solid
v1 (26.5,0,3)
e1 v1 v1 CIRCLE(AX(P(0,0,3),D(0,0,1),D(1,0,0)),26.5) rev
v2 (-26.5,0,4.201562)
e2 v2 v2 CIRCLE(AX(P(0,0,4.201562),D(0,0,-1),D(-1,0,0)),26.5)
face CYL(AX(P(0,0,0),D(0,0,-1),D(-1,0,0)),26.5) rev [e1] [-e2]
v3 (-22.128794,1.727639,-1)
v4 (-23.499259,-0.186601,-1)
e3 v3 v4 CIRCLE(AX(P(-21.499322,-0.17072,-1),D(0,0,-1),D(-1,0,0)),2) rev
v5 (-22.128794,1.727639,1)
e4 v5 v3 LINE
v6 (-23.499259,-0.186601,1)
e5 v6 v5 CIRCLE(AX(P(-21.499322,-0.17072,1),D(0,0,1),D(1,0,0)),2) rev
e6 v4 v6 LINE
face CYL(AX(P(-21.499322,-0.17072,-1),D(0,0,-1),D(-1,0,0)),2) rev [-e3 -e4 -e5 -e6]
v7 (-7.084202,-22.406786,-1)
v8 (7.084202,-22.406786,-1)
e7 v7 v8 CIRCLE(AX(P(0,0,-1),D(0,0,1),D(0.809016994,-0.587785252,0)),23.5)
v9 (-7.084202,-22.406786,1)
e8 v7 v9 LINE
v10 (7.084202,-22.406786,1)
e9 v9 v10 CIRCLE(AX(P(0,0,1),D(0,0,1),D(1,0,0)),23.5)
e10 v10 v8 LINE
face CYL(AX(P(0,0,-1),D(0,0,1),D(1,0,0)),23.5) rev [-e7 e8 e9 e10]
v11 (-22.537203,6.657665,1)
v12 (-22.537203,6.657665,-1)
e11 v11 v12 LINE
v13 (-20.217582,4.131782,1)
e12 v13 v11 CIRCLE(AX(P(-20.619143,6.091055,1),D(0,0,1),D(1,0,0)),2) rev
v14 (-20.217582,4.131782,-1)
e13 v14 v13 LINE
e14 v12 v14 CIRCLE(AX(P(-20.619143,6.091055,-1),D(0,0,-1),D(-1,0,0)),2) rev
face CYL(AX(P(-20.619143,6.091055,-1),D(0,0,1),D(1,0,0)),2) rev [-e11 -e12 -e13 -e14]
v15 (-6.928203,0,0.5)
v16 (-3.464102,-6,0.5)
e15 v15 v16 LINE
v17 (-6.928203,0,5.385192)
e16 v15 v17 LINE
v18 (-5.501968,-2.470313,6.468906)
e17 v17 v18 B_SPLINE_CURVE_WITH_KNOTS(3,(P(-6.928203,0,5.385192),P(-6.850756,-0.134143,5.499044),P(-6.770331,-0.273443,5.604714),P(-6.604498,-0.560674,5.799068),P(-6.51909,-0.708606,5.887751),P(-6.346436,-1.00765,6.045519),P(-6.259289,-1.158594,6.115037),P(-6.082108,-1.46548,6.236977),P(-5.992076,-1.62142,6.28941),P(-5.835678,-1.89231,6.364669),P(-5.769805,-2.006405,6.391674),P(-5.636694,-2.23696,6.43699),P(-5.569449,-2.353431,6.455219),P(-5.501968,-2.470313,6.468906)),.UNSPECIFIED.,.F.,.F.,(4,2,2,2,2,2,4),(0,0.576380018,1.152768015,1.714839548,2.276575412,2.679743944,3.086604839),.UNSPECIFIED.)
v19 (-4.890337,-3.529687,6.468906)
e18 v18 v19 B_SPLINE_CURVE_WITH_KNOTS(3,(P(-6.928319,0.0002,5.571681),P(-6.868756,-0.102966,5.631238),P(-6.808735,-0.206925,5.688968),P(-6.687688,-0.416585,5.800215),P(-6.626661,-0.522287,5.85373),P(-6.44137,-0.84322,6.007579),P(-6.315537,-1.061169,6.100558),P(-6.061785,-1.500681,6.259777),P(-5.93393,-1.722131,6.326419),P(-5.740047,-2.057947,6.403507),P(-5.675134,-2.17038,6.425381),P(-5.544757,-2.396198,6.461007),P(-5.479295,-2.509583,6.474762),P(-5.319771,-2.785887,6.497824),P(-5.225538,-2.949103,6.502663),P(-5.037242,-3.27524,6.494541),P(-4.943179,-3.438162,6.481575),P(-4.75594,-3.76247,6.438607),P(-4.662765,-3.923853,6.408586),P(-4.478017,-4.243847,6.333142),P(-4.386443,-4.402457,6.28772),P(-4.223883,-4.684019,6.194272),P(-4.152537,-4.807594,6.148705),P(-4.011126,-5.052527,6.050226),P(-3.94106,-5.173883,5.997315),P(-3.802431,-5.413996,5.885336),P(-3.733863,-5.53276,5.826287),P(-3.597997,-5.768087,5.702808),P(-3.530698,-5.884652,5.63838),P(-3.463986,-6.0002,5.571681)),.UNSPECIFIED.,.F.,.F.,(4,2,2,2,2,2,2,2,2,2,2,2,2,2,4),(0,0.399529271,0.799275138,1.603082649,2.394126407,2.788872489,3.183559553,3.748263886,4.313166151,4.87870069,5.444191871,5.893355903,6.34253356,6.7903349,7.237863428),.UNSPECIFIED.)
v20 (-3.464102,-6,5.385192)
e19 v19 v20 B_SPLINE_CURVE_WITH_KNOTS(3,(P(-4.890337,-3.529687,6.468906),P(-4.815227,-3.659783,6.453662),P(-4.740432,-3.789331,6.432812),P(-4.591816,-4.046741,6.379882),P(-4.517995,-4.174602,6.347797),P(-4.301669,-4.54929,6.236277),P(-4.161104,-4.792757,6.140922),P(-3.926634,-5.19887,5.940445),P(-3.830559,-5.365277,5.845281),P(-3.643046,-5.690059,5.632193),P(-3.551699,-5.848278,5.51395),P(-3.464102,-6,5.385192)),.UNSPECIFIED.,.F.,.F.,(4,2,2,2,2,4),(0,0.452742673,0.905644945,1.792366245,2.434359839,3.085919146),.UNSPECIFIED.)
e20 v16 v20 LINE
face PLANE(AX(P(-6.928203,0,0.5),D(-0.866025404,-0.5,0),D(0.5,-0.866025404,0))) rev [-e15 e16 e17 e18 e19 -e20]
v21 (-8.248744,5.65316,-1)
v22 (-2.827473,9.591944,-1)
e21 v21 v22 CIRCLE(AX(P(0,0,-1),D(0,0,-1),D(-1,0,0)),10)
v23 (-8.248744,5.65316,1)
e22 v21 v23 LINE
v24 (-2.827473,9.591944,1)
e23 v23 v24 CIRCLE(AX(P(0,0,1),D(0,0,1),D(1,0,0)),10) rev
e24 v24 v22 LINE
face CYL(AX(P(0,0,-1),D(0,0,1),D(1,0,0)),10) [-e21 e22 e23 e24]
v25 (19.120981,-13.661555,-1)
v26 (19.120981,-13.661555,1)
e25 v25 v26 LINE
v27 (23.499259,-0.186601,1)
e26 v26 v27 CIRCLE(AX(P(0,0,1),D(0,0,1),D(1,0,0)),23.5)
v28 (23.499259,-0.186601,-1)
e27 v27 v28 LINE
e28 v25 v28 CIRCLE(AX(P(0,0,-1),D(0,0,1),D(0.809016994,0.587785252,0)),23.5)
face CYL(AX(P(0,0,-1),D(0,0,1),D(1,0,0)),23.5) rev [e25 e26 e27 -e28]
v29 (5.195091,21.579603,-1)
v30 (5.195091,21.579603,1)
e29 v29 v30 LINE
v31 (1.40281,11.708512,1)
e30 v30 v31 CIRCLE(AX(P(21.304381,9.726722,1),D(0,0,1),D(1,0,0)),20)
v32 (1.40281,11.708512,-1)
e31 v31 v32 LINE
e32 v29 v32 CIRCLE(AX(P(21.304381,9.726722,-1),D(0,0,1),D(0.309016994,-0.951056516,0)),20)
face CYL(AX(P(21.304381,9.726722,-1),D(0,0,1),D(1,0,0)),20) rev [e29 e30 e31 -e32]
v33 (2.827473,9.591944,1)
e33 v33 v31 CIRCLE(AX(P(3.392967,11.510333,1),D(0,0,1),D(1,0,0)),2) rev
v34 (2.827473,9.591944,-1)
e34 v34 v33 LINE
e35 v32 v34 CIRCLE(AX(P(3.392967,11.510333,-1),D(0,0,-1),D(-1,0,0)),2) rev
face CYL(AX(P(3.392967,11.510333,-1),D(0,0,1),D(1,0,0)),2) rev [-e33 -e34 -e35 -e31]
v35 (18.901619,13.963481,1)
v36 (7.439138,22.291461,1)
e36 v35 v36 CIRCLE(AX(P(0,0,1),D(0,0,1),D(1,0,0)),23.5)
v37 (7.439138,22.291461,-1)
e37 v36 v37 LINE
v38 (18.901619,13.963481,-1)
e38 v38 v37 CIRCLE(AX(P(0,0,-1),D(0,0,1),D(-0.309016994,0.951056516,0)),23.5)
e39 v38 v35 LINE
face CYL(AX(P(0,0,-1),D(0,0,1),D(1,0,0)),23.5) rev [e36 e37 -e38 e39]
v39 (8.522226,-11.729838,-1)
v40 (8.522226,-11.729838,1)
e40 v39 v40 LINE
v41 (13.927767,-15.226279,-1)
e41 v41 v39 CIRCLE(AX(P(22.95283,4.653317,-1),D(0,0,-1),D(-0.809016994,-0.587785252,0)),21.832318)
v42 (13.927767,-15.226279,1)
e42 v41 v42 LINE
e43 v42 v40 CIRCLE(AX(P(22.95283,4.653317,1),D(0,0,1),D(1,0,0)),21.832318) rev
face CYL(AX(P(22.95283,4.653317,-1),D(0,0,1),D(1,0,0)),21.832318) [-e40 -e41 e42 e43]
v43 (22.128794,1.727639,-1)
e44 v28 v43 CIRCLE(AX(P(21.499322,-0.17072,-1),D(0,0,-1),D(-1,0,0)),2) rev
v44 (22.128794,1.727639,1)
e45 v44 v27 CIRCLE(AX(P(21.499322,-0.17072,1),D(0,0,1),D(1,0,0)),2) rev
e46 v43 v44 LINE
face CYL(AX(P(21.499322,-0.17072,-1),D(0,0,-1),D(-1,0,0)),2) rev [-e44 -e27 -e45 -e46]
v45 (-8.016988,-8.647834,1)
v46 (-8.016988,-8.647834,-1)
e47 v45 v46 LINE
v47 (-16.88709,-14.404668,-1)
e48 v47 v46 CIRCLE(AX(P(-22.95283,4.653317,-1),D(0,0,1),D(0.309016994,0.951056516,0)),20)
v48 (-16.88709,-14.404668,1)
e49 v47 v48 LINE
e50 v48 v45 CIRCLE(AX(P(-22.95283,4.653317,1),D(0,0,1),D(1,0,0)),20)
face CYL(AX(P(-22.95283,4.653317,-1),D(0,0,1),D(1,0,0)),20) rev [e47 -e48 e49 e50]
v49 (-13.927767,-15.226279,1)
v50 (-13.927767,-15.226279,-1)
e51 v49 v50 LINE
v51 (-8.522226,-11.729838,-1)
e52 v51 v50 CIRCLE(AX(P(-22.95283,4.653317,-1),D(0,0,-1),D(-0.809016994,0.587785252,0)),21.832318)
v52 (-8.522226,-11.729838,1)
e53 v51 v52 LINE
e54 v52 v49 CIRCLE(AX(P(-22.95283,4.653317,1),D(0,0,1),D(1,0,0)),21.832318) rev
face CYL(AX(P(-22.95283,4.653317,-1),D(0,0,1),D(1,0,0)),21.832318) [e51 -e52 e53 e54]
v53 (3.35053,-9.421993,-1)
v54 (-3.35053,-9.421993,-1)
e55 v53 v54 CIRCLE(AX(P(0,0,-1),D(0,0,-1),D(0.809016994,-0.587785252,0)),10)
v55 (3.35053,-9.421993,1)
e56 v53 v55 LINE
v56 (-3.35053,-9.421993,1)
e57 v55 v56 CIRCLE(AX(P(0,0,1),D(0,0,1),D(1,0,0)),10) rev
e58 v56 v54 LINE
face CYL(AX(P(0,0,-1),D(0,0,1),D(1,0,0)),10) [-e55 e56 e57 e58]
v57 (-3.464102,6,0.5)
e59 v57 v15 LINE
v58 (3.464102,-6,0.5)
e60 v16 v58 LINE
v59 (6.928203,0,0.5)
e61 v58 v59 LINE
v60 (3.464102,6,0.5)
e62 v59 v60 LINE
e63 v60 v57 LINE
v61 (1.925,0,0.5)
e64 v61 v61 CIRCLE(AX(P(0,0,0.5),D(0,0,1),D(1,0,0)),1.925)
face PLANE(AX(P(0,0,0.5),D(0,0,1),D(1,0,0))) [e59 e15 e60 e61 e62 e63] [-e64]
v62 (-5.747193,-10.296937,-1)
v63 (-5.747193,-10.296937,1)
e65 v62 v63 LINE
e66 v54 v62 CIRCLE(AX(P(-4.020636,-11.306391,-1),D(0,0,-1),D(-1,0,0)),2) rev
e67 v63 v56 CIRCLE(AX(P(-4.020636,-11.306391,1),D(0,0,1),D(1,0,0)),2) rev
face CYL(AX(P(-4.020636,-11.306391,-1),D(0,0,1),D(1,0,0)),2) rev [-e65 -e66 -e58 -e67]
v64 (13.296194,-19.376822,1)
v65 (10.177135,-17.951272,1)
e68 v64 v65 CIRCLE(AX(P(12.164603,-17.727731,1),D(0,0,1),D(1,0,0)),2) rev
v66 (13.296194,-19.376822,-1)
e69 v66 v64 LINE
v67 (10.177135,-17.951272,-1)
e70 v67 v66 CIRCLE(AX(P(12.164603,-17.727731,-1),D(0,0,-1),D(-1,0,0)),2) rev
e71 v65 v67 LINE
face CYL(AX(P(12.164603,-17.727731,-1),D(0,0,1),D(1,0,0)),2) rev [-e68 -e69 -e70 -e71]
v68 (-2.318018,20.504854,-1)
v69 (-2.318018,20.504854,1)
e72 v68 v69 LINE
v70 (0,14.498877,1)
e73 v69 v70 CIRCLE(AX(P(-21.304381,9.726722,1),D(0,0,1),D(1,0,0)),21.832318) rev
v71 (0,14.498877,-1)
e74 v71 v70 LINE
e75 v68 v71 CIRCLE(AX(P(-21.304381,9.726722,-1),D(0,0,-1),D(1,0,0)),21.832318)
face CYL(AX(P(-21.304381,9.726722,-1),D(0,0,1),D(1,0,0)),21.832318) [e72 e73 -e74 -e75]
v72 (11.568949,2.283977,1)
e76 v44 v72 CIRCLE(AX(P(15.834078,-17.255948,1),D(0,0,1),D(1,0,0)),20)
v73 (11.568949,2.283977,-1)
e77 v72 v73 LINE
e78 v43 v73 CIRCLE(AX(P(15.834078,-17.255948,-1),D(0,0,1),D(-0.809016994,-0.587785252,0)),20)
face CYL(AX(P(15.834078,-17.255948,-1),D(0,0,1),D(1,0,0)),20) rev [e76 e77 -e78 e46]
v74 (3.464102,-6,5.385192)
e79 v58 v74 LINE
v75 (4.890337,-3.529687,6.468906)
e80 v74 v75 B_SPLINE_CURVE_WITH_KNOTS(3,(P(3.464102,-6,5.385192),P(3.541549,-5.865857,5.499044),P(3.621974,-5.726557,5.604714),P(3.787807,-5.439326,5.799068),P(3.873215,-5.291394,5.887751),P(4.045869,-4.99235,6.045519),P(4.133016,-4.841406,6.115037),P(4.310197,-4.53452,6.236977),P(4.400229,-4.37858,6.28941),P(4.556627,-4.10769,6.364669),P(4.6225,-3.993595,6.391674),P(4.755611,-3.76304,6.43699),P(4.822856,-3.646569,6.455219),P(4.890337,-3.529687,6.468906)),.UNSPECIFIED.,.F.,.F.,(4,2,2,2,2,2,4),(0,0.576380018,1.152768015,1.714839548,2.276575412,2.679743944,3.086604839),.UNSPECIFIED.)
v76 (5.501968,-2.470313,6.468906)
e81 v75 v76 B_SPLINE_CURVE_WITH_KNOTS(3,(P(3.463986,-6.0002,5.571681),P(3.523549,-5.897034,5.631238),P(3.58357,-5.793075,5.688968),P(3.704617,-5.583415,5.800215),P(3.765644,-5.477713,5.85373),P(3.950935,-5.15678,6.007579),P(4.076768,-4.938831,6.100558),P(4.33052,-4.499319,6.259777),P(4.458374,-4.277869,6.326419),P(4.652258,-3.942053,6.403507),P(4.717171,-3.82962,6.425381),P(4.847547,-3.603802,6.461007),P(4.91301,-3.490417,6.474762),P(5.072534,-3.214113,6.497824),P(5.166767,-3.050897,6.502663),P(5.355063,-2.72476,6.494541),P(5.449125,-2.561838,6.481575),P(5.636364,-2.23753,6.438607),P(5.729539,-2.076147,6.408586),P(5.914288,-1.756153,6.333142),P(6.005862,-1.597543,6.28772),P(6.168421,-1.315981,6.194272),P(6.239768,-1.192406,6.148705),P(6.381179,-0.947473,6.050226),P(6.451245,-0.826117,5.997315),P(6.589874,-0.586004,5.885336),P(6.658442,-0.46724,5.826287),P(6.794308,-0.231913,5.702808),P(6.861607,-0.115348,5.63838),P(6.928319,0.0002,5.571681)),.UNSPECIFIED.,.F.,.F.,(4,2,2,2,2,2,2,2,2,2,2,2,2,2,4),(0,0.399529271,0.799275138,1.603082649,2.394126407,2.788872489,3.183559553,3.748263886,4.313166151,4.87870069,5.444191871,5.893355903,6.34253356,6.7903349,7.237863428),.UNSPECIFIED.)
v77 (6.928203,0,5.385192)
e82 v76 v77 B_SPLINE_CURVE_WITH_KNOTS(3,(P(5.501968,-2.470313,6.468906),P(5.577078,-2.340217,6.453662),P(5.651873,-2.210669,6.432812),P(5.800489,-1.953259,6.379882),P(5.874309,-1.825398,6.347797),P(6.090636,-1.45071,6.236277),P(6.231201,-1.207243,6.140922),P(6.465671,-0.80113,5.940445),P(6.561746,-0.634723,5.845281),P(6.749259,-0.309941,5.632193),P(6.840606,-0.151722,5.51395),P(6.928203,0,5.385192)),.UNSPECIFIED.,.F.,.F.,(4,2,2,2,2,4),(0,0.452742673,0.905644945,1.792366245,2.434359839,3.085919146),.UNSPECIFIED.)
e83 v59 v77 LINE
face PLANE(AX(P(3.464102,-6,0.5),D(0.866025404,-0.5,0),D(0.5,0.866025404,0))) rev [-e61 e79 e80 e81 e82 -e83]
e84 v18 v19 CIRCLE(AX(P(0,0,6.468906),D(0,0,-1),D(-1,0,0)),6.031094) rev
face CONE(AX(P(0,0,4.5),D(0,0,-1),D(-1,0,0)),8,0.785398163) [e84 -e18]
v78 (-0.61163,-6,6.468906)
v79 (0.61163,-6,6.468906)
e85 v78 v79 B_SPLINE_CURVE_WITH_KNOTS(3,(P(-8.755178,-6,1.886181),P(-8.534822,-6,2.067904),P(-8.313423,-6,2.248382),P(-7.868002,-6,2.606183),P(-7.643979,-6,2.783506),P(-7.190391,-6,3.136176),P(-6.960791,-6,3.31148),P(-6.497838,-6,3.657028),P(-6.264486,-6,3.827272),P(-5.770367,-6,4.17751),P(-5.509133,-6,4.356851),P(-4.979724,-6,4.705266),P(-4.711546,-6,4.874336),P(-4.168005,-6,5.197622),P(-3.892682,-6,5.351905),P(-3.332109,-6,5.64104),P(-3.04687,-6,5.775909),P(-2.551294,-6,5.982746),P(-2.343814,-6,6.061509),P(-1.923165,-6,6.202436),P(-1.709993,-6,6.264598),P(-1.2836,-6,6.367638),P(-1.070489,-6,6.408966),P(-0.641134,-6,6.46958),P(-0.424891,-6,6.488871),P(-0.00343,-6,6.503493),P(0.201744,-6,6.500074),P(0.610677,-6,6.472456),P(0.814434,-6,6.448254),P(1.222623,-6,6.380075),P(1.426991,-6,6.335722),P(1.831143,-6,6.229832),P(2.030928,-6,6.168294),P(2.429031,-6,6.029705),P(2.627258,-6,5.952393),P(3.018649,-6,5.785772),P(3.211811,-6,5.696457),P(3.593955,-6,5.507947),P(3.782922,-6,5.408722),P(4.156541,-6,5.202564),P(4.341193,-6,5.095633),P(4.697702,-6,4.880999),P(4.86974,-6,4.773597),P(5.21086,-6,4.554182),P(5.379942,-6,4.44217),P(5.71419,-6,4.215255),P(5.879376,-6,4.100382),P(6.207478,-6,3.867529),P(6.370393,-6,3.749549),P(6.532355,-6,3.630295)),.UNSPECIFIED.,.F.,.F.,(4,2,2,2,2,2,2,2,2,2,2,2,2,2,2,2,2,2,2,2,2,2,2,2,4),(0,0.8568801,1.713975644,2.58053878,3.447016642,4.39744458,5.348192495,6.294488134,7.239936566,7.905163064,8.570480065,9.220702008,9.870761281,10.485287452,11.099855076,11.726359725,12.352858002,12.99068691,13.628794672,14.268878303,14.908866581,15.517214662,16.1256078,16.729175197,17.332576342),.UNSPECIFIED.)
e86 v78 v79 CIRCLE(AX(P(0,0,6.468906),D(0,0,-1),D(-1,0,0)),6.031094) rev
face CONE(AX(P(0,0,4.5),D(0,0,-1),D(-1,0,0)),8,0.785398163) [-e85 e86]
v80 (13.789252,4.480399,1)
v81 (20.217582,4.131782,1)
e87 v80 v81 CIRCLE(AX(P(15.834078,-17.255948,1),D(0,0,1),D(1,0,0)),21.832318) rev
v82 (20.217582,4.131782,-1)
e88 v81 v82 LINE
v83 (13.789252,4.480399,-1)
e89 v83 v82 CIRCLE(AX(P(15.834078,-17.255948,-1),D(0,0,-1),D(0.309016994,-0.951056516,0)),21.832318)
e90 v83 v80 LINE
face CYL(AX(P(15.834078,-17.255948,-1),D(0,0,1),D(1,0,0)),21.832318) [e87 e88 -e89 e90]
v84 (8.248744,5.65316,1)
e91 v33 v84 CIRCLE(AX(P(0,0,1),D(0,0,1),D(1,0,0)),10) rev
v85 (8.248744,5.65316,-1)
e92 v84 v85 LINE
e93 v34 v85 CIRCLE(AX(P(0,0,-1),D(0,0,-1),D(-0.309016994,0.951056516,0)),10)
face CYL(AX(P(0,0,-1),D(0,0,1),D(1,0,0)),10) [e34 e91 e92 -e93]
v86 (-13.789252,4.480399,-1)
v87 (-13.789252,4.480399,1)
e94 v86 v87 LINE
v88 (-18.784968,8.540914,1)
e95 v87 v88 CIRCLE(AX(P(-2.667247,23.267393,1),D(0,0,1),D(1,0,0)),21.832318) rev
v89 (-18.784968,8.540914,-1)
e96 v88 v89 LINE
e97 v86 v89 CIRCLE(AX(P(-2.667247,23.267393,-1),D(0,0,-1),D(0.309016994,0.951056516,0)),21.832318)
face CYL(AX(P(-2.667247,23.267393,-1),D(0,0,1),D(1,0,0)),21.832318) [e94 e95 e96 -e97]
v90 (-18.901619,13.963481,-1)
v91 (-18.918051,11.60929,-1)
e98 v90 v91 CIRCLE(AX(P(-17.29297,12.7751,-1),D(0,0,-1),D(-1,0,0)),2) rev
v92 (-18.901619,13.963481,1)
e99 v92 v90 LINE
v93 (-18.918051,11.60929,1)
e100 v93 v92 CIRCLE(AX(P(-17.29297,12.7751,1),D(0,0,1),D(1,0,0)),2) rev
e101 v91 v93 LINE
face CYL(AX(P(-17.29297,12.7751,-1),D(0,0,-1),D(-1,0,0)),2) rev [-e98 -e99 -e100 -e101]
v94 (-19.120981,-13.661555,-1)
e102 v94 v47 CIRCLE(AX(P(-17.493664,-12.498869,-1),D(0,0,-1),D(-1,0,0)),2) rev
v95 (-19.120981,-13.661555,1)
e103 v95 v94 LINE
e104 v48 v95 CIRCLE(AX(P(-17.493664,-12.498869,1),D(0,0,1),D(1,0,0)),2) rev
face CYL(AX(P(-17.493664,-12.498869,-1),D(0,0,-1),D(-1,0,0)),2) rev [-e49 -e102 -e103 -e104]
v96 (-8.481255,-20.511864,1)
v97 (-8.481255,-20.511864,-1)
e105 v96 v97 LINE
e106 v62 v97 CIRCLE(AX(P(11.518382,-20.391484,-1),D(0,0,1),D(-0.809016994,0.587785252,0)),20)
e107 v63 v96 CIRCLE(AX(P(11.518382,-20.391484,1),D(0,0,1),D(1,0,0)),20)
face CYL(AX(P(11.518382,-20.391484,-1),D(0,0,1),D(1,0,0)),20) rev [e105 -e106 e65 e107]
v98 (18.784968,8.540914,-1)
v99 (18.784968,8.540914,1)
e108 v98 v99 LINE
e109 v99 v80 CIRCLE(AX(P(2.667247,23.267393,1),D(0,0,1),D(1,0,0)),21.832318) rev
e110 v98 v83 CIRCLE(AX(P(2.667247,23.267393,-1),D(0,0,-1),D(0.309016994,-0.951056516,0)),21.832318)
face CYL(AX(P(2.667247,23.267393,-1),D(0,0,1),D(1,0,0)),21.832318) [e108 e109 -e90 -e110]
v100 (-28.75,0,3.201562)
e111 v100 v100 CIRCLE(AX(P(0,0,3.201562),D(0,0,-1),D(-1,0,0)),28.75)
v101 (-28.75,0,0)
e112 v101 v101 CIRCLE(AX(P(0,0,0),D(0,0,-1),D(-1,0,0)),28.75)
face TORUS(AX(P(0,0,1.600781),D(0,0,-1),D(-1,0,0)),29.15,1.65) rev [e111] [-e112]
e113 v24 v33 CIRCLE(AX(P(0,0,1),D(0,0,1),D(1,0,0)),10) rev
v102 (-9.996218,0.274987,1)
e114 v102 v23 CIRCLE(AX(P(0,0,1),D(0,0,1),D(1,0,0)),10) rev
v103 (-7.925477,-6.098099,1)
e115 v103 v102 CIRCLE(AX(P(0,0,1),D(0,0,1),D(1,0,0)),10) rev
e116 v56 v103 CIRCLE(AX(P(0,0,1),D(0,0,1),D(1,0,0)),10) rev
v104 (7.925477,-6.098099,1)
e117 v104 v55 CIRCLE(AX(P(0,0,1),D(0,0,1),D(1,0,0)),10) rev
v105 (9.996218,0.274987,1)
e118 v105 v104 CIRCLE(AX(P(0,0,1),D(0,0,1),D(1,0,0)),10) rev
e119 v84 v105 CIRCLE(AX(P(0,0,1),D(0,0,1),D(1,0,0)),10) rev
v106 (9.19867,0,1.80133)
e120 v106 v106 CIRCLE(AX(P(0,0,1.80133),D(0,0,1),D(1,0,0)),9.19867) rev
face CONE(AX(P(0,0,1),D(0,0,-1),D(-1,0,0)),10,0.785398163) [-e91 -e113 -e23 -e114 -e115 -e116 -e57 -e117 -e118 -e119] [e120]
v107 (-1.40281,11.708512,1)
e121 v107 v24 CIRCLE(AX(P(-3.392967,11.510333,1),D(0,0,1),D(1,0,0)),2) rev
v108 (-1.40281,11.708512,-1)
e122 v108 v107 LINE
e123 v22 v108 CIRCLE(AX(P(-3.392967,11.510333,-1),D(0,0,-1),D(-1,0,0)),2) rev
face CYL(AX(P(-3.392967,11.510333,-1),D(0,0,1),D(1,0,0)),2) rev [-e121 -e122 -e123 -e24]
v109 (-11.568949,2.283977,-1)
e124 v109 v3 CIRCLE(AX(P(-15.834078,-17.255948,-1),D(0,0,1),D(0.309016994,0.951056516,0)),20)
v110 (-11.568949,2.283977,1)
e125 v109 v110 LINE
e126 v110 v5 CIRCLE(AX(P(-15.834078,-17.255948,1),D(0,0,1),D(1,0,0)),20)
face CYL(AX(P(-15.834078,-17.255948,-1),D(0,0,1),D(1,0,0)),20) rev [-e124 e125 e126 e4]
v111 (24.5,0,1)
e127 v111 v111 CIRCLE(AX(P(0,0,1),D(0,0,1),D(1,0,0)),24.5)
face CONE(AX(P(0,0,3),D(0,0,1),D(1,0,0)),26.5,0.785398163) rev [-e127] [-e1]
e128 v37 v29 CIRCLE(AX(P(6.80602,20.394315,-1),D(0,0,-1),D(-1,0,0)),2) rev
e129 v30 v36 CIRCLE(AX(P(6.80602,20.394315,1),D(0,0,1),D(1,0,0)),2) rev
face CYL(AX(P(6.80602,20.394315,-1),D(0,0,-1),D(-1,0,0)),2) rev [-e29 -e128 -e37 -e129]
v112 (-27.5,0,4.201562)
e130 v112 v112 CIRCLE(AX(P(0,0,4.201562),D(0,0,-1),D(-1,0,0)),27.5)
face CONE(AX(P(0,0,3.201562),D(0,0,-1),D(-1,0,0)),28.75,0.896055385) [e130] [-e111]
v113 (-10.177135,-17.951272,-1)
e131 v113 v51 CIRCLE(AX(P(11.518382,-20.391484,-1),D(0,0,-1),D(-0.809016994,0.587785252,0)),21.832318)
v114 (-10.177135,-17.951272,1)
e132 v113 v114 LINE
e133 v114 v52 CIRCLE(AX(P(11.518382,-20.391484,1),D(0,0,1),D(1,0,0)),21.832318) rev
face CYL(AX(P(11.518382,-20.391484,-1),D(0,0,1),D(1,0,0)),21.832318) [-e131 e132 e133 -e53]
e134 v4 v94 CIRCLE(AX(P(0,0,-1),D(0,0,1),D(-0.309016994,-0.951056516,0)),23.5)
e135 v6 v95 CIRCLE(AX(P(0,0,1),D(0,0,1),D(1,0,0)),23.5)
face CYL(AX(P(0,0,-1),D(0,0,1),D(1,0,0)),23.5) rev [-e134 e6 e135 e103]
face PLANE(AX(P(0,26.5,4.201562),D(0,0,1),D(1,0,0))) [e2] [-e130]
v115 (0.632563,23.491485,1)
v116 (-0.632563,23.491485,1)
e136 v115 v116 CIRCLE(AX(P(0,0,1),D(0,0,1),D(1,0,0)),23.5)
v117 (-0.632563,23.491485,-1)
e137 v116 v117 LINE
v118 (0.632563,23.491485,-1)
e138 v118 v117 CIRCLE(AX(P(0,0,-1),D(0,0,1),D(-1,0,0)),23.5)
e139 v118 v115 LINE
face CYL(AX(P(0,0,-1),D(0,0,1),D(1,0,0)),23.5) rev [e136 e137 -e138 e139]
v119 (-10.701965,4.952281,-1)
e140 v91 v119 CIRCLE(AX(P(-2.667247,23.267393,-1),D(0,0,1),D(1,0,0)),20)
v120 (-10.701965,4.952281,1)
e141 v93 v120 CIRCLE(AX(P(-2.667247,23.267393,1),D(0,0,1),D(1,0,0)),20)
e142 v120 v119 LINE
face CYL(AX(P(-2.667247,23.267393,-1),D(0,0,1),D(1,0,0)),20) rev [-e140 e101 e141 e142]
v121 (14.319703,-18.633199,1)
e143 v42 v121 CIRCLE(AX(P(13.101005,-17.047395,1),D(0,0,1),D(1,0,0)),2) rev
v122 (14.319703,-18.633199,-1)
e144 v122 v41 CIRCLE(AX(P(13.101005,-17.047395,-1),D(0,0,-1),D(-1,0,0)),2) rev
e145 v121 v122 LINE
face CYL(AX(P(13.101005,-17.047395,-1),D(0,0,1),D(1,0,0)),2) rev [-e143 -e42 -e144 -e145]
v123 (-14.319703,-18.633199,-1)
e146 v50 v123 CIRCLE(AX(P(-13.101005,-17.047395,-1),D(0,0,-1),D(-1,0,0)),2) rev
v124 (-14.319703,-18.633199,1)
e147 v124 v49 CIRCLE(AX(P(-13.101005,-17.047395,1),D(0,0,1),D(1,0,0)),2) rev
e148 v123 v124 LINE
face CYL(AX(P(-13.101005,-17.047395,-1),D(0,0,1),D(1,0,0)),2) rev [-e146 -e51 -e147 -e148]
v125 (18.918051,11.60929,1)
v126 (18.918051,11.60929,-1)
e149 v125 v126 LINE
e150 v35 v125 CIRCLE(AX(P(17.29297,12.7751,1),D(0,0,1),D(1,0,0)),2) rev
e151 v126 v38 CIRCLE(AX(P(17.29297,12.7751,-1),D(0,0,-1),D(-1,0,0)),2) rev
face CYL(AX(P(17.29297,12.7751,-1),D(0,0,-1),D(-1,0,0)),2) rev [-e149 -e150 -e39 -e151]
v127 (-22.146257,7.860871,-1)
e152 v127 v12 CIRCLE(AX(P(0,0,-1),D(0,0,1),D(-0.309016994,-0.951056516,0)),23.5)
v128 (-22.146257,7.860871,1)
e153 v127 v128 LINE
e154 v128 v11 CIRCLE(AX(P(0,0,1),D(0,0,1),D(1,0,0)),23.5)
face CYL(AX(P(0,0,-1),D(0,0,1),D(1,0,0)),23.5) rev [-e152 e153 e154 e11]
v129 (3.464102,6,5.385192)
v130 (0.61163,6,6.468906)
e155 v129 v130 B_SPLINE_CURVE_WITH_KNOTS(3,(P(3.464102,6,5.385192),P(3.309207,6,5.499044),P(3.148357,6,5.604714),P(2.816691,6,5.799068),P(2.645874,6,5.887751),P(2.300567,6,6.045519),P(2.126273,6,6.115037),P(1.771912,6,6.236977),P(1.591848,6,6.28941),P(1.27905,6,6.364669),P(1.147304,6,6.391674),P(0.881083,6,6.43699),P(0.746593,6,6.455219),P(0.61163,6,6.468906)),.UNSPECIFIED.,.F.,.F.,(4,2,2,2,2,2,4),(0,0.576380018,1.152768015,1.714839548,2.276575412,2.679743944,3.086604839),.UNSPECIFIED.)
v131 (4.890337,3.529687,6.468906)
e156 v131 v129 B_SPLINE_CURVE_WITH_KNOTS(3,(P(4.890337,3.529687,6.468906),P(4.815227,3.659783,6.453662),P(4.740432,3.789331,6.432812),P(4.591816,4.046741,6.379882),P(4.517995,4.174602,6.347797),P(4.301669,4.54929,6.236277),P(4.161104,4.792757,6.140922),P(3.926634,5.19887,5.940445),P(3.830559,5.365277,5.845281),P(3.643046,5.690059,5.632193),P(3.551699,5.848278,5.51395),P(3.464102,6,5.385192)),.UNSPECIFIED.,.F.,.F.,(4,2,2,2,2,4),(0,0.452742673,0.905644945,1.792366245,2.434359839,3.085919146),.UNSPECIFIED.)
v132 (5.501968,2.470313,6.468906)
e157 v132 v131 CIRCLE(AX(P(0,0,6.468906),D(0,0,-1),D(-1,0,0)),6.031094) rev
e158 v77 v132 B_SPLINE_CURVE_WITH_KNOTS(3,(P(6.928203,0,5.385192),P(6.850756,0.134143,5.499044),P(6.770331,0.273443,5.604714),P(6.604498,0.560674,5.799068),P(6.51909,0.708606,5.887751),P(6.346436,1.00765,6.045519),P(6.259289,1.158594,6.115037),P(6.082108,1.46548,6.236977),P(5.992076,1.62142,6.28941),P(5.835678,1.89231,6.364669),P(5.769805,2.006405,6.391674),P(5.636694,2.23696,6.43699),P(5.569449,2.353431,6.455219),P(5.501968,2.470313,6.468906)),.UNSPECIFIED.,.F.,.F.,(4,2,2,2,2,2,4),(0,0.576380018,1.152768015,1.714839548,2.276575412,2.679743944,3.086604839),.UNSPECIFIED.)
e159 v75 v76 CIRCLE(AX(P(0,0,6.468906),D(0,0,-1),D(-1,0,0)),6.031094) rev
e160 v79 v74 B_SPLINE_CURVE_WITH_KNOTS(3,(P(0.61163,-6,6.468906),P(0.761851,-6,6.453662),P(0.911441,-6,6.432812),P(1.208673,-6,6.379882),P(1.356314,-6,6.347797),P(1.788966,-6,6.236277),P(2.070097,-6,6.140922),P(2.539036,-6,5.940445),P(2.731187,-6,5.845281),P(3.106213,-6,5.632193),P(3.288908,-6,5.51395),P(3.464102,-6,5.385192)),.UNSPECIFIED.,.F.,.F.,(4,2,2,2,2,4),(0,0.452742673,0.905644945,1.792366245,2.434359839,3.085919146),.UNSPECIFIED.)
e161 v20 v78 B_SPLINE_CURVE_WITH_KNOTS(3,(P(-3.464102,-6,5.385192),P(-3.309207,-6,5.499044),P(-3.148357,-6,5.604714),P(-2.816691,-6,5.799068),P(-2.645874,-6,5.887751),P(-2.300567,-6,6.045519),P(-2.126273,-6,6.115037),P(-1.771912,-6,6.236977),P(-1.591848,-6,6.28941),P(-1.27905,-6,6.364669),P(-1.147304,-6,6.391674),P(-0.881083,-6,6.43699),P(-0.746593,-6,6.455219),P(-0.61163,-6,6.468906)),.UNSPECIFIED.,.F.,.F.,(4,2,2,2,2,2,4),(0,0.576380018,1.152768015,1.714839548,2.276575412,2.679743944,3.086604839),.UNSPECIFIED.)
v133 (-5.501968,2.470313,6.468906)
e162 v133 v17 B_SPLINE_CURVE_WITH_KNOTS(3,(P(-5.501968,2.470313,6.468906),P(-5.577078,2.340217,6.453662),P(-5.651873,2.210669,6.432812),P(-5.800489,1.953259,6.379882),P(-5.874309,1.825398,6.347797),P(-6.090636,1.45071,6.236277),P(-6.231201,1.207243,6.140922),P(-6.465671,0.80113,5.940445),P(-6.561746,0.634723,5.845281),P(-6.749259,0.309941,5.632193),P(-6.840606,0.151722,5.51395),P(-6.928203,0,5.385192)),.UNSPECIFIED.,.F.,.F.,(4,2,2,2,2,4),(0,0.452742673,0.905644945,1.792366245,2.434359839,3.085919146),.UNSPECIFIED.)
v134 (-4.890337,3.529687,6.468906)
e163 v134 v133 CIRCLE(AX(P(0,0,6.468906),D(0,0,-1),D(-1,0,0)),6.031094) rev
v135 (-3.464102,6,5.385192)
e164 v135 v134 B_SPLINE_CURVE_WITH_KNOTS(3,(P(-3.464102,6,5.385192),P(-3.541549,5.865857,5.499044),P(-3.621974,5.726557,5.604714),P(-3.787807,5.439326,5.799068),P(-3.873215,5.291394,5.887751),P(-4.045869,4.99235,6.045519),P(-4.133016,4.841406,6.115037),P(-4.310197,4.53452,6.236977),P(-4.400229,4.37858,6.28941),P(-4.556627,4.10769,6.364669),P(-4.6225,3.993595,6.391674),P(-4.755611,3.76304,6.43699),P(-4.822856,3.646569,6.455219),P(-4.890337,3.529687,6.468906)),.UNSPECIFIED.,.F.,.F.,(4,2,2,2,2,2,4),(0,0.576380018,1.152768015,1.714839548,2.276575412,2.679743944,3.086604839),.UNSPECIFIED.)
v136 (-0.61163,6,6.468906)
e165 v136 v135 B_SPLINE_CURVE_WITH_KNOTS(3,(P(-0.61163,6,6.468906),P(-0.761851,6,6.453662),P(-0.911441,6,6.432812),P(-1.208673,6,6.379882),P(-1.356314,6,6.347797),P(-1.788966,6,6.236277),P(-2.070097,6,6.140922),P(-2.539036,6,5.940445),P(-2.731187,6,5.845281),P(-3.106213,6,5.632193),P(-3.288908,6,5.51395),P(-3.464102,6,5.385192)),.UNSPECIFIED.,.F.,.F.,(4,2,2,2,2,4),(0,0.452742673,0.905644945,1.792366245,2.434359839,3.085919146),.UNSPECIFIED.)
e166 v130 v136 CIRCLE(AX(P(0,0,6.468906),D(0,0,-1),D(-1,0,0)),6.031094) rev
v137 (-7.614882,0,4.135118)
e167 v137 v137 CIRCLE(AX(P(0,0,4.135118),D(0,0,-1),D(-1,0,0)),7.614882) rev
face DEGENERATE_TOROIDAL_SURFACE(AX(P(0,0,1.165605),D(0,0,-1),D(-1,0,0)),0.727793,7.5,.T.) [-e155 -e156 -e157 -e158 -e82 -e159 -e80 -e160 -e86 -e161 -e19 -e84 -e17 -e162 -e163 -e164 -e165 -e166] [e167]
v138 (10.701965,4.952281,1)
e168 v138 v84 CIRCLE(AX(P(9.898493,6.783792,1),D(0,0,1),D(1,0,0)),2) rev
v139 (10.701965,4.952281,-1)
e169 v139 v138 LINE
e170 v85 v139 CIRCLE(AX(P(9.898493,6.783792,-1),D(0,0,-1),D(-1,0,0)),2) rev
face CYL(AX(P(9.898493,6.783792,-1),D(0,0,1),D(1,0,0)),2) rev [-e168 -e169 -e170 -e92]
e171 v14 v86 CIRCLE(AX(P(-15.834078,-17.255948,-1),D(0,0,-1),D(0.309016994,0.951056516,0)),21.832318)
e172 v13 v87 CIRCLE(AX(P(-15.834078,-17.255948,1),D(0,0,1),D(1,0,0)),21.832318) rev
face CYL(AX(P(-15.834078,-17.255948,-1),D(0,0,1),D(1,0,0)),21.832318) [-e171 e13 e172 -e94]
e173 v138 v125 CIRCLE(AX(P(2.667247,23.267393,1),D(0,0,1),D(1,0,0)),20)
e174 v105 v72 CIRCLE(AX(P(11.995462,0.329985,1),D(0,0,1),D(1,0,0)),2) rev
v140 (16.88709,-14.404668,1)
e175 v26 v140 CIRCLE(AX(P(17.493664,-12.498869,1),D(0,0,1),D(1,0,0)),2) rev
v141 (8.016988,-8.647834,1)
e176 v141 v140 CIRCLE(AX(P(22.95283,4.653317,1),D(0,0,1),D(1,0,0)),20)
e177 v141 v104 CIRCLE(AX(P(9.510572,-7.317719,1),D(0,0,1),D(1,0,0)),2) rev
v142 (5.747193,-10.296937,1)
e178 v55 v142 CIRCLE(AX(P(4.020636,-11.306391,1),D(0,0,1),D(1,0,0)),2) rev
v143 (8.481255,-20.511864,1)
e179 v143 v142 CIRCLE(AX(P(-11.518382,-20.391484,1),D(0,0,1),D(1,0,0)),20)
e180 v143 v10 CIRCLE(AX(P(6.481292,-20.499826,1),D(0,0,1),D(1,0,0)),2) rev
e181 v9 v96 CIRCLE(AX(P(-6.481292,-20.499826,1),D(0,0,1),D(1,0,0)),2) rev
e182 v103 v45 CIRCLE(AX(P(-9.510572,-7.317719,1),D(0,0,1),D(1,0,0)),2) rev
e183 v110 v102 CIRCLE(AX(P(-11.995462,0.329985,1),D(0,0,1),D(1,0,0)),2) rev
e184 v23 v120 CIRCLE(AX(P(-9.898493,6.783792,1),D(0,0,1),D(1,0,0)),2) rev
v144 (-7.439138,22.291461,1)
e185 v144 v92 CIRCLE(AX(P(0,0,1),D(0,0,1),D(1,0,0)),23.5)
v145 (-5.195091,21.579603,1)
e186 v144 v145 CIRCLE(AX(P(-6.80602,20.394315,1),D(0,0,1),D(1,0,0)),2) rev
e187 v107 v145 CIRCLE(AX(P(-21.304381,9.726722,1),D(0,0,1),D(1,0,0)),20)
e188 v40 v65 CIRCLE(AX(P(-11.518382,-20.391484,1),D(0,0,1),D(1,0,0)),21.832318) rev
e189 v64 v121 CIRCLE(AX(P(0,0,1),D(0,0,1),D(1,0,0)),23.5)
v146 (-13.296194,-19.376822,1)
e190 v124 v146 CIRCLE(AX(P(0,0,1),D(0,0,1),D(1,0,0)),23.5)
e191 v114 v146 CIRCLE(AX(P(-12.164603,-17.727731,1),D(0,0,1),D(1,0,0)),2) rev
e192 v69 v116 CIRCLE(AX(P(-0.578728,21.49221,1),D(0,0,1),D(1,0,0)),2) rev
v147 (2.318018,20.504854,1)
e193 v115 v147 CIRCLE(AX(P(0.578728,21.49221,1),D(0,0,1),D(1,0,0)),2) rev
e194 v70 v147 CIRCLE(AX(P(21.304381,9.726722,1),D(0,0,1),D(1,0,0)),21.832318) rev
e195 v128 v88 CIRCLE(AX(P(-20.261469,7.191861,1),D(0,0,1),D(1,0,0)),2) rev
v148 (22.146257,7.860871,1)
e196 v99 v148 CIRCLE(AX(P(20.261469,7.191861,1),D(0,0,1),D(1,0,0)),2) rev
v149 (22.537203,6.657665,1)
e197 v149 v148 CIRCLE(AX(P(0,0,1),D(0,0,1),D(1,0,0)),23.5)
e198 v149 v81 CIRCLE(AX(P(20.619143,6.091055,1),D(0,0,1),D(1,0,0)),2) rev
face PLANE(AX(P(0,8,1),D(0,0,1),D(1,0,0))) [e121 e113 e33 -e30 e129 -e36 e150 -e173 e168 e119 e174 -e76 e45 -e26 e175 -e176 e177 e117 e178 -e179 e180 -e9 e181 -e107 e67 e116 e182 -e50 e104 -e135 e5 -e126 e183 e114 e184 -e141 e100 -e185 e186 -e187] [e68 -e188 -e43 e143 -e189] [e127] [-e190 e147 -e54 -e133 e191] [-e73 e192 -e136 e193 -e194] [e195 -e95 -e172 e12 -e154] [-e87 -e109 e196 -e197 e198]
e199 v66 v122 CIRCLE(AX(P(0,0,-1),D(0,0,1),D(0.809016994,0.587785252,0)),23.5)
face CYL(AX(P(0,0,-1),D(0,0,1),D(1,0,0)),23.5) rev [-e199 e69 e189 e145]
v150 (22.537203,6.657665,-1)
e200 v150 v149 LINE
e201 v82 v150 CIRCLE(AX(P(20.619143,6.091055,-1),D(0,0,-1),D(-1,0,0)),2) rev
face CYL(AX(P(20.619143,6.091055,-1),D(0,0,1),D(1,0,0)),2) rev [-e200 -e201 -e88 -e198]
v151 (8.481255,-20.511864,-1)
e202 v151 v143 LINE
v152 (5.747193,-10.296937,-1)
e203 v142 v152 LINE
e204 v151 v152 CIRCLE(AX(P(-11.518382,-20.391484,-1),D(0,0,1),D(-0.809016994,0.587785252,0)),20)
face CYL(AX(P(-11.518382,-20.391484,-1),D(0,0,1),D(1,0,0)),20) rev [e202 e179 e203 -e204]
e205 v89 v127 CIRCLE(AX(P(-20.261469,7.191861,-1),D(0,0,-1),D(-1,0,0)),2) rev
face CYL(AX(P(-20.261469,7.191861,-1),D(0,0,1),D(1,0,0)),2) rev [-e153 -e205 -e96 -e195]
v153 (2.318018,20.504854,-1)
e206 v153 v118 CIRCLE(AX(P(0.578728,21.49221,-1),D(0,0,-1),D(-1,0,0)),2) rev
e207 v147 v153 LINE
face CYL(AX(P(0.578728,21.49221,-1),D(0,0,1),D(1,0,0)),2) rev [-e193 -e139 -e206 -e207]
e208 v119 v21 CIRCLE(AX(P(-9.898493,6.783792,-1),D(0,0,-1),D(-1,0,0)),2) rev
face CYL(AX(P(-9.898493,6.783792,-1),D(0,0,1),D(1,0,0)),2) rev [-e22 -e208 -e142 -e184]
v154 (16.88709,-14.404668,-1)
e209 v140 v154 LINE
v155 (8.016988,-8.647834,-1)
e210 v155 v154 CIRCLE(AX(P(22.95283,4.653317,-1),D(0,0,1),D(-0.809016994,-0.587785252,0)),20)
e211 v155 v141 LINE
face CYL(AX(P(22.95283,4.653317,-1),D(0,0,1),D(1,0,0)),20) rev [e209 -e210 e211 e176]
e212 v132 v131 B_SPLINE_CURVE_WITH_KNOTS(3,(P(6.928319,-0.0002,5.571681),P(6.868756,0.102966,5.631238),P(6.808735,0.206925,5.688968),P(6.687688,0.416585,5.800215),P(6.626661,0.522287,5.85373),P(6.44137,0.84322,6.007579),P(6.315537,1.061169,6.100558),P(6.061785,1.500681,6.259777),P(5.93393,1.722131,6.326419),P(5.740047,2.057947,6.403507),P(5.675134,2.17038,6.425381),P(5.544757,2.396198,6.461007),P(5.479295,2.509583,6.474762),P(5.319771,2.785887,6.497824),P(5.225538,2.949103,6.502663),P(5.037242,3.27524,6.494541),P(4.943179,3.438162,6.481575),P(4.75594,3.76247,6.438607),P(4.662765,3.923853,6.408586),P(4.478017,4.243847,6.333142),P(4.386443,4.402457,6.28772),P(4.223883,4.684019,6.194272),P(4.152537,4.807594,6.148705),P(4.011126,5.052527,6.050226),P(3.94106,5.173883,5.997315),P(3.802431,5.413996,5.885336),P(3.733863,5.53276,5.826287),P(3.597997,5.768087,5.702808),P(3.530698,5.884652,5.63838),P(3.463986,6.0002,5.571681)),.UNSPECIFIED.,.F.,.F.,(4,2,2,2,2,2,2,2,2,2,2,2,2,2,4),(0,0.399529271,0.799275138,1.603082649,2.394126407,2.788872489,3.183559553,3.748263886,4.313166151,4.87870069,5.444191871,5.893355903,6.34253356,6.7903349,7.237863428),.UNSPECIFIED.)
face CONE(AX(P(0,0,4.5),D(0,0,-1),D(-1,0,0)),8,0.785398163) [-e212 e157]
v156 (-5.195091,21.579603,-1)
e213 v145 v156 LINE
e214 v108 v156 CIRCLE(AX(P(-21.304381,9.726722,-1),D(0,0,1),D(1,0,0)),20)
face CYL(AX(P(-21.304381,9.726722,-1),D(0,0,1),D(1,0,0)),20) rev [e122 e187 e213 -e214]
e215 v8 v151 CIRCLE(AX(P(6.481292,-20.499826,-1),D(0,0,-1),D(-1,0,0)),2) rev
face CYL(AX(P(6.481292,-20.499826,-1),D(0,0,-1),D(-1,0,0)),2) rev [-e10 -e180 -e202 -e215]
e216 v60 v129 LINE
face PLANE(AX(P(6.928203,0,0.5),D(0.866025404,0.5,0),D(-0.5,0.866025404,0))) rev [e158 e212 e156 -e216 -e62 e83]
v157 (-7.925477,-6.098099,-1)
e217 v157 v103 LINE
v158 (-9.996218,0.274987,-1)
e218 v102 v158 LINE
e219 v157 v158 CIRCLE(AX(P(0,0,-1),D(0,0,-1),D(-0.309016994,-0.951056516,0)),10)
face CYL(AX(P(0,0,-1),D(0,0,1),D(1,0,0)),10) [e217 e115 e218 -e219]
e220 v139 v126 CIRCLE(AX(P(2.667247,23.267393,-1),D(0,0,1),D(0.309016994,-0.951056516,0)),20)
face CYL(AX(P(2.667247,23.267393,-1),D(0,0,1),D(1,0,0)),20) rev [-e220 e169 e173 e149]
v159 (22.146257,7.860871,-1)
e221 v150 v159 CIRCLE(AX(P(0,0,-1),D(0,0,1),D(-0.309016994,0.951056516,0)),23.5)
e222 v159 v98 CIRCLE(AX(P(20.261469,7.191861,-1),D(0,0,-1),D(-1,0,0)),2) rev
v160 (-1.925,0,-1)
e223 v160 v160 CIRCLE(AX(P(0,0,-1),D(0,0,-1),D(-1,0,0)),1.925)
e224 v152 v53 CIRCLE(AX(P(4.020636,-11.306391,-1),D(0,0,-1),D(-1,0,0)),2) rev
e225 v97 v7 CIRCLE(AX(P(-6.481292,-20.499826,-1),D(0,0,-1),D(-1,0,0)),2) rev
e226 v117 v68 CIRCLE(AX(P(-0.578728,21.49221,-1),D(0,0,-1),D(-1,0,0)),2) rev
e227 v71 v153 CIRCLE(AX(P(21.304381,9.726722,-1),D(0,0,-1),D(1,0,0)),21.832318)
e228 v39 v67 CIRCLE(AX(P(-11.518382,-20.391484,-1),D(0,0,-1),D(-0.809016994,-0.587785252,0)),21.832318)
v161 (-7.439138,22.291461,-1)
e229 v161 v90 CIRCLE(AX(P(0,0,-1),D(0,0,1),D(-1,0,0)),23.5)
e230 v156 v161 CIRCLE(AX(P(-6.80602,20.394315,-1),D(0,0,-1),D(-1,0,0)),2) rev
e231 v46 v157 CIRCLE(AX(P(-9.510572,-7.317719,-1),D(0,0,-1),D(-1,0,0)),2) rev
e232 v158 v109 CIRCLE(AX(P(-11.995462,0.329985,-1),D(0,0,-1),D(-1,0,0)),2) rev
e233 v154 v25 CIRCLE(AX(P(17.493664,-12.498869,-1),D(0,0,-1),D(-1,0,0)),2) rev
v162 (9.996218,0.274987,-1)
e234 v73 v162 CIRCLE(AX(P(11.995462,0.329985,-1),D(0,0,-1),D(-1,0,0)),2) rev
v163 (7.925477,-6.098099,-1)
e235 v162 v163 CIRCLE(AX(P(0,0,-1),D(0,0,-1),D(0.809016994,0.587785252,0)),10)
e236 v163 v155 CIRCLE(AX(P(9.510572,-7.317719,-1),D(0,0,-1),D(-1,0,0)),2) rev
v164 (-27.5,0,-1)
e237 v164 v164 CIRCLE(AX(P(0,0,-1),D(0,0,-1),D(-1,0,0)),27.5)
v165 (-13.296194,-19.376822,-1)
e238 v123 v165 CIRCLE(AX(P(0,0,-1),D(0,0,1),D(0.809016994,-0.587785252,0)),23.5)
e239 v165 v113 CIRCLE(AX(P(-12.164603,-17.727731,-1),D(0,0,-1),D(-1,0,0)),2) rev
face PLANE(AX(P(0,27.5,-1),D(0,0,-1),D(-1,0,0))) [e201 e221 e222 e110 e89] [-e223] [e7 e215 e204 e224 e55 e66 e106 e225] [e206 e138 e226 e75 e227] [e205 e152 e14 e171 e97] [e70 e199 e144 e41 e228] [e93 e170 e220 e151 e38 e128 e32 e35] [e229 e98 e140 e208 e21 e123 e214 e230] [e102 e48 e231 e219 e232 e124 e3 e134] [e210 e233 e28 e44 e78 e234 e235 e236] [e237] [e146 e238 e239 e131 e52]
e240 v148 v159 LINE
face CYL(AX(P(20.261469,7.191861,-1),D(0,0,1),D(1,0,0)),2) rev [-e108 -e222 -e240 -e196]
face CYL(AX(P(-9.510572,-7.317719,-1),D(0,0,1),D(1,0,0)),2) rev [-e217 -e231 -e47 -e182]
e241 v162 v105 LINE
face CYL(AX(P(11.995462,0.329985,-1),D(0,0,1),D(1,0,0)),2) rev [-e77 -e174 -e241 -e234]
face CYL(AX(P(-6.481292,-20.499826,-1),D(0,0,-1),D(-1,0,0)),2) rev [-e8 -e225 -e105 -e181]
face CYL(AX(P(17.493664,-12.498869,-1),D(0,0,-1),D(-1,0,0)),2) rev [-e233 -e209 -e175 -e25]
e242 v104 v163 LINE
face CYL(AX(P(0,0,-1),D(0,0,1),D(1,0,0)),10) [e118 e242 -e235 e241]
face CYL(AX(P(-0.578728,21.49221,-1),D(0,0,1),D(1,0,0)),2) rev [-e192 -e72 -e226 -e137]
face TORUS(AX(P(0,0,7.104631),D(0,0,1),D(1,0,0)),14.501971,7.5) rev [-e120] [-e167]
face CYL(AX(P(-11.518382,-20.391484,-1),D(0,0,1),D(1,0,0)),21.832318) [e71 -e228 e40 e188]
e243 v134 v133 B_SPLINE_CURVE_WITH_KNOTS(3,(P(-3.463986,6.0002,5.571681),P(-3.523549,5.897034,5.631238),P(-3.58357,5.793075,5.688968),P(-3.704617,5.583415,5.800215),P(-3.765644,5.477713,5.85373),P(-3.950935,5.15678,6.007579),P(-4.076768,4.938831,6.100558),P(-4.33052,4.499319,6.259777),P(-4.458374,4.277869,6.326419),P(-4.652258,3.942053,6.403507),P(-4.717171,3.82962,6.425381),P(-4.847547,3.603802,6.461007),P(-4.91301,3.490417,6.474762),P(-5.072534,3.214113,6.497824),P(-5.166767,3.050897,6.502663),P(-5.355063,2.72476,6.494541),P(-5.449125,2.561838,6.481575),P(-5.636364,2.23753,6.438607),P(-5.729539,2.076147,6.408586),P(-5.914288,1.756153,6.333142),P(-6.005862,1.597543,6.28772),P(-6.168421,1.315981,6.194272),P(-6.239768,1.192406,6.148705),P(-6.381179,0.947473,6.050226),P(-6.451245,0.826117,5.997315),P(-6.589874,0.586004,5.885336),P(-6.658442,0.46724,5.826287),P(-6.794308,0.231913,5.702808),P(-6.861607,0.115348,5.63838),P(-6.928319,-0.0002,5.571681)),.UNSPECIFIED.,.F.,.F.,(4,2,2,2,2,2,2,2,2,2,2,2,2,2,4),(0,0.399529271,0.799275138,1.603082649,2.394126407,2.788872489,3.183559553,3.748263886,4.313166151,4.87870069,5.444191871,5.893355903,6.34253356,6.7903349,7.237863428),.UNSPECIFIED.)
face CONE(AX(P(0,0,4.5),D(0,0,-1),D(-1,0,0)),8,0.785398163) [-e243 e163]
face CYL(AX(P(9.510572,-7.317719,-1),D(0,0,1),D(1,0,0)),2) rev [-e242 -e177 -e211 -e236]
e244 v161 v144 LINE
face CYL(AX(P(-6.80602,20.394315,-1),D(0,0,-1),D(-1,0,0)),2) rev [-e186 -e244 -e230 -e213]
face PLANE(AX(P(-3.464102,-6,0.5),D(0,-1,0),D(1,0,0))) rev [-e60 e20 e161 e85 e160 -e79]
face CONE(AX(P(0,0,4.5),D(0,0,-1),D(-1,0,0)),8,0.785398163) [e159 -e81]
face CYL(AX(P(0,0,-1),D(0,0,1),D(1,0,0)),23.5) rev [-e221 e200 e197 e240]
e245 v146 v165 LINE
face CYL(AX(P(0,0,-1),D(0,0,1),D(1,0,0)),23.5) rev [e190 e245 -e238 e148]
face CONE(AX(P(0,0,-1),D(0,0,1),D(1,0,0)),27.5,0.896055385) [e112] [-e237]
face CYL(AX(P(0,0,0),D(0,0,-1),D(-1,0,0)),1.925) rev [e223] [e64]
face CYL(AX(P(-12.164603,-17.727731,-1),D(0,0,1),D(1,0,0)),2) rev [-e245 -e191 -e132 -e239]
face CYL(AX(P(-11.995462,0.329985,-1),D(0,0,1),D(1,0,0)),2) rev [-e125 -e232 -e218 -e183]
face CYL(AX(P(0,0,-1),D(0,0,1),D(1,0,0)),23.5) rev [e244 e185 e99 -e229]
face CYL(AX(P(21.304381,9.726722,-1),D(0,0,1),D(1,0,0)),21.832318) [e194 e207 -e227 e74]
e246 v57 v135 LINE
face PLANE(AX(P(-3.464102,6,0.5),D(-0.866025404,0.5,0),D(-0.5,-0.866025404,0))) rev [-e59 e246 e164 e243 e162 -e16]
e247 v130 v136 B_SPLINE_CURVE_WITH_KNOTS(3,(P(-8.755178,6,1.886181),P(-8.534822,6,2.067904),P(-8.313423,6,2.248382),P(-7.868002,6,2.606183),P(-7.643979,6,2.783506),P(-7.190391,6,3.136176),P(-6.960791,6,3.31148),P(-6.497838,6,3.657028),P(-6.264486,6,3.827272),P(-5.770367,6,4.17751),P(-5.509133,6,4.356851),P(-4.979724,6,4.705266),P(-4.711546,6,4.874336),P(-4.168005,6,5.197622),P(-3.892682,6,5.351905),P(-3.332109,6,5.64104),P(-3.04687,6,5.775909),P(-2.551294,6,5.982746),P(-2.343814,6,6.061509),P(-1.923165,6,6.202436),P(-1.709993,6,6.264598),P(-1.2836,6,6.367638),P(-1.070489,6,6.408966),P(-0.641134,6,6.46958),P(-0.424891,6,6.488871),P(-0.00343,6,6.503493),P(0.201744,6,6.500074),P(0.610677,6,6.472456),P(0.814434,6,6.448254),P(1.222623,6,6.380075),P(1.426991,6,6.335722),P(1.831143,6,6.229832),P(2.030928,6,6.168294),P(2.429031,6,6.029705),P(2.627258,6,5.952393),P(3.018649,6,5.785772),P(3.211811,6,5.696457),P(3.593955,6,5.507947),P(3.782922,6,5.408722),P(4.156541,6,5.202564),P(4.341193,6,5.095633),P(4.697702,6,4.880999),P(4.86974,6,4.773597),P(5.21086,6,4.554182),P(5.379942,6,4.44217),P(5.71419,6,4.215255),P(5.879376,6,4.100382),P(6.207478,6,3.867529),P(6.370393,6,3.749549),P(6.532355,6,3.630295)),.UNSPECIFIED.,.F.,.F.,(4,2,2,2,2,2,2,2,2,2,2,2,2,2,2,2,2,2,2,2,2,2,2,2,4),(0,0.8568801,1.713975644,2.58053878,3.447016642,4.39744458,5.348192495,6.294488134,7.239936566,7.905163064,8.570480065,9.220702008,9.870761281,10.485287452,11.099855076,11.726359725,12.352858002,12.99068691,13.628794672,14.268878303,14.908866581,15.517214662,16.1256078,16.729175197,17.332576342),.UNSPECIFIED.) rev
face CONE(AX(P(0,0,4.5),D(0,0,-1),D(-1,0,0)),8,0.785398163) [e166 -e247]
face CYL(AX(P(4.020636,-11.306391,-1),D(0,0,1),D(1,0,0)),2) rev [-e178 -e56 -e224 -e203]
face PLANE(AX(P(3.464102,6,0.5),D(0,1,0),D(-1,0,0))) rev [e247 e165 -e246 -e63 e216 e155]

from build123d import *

# Parameters (mm, degrees)
CHAMFER1_SIZE            = 2
CUT_EXTRUDE1_DEPTH       = 6
CUT_EXTRUDE2_DEPTH       = 42.028953192
FILLET2_R                = 2
CIRPATTERN1_COUNT        = 5
FILLET2_OF_CIRPATTERN1_R = 2
FILLET3_R                = 7.5
FILLET4_R                = 7.5


with BuildPart() as part:
    # Sketch1 → Revolve1 (revolve)
    with BuildSketch(Plane(origin=(0, 0, 0), x_dir=(0, 0, -1), z_dir=(1, 0, 0)), mode=Mode.PRIVATE) as revolve1_sk:
        with BuildLine():
            Line((1, 1.925), (-1, 1.925))
            Line((-1, 1.925), (-6.5, 1.925))
            Line((-6.5, 1.925), (-6.5, 8))
            Line((-6.5, 8), (-1, 8))
            Line((-1, 8), (-1, 26.5))
            Line((-1, 26.5), (-4.201562119, 26.5))
            Line((-4.201562119, 26.5), (-4.201562119, 27.5))
            Line((-4.201562119, 27.5), (-3.201562119, 28.75))
            ThreePointArc((-3.201562119, 28.75), (-1.600781059, 27.5), (0, 28.75))
            Line((0, 28.75), (1, 27.5))
            Line((1, 27.5), (1, 26.5))
            Line((1, 26.5), (1, 1.925))
        make_face()
    revolve(revolve1_sk.sketch.rotate(Axis((0, 0, 0), (0, 0, 1)), 90), axis=Axis((0, 0, 0), (0, 0, 1)))

    # Chamfer1
    chamfer1_edges = [part.edges().sort_by_distance(p)[0] for p in [
        (8, 0, 1),
        (26.5, 0, 1),
        (8, 0, 6.5),
    ]]
    chamfer(chamfer1_edges, length=CHAMFER1_SIZE)

    # Sketch2 → Cut-Extrude1 (cut)
    with BuildSketch(Plane.XY.offset(6.5)):
        Polygon((3.464101615, 6), (-3.464101615, 6), (-6.92820323, 0), (-3.464101615, -6), (3.464101615, -6), (6.92820323, 0), align=None)
    extrude(amount=-CUT_EXTRUDE1_DEPTH, mode=Mode.SUBTRACT)

    # Sketch4 → Cut-Extrude2 (cut, symmetric)
    with BuildSketch(Plane.XY.offset(1)):
        with BuildLine():
            ThreePointArc((-9.025852843, 4.305110968), (-5.877852523, 8.090169944), (-1.305261922, 9.914448614))
            ThreePointArc((-1.305261922, 9.914448614), (-2.56946738, 16.726937639), (-6.08224756, 22.699256918))
            ThreePointArc((-6.08224756, 22.699256918), (-13.812953429, 19.011899368), (-19.708758347, 12.799017323))
            ThreePointArc((-19.708758347, 12.799017323), (-15.114253953, 7.612616689), (-9.025852843, 4.305110968))
        make_face()
        with BuildLine():
            ThreePointArc((-4.080732175, 23.142982196), (0, 23.5), (4.080732175, 23.142982196))
            ThreePointArc((4.080732175, 23.142982196), (1.56147319, 19.047006697), (0, 14.498877126))
            ThreePointArc((0, 14.498877126), (-1.56147319, 19.047006697), (-4.080732175, 23.142982196))
        make_face()
    cut_extrude2 = extrude(amount=CUT_EXTRUDE2_DEPTH, both=True, mode=Mode.SUBTRACT)

    # Fillet2
    fillet2_edges = [part.edges().sort_by_distance(p)[0] for p in [
        (-4.080732175, 23.142982196, 0),
        (4.080732175, 23.142982196, 0),
        (-1.305261922, 9.914448614, 0),
        (-6.08224756, 22.699256918, 0),
        (-9.025852843, 4.305110968, 0),
        (-19.708758347, 12.799017323, 0),
    ]]
    fillet(fillet2_edges, radius=FILLET2_R)

    # CirPattern1: Cut-Extrude2 ×5 about axis
    cirpattern1_axis = Axis((0, 0, 0), (0, 0, 1))
    for i in range(1, CIRPATTERN1_COUNT):
        add(cut_extrude2.rotate(cirpattern1_axis, i * 360 / CIRPATTERN1_COUNT), mode=Mode.SUBTRACT)

    # Fillet2 of CirPattern1
    fillet2_of_cirpattern1_edges = [part.edges().sort_by_distance(p)[0] for p in [
        (-23.271299615, 3.270567873, 0),
        (-20.749268432, 11.032581725, 0),
        (-9.832549076, 1.822355255, 0),
        (-23.467794067, 1.229894972, 0),
        (-6.883545757, -7.25374371, 0),
        (-18.262930094, -14.78902919, 0),
        (-10.30172195, -21.121660088, 0),
        (-16.904485308, -16.324471706, 0),
        (-4.771587603, -8.788171127, 0),
        (-8.421646814, -21.939140023, 0),
        (4.771587603, -8.788171127, 0),
        (8.421646814, -21.939140023, 0),
        (16.904485308, -16.324471706, 0),
        (10.30172195, -21.121660088, 0),
        (6.883545757, -7.25374371, 0),
        (18.262930094, -14.78902919, 0),
        (9.832549076, 1.822355255, 0),
        (23.467794067, 1.229894972, 0),
        (20.749268432, 11.032581725, 0),
        (23.271299615, 3.270567873, 0),
        (9.025852843, 4.305110968, 0),
        (19.708758347, 12.799017323, 0),
        (1.305261922, 9.914448614, 0),
        (6.08224756, 22.699256918, 0),
    ]]
    fillet(fillet2_of_cirpattern1_edges, radius=FILLET2_OF_CIRPATTERN1_R)

    # Fillet3
    # the kernel refuses this fillet: 7.5 mm, written as the material it takes off along each edge
    with BuildSketch(Plane(origin=(0, 0, 4.5), x_dir=(-1, 0, 0), z_dir=(0, 1, 0))) as fillet3_piece_1:
        with BuildLine():
            CenterArc((0.727792874, -3.334394592), FILLET3_R, 14.157365729, 30.842634271)
            Line((6.031093733, 1.968906267), (6.13715975, 2.074972284))
            Line((6.13715975, 2.074972284), (8.106066017, 0.106066017))
            Line((8.106066017, 0.106066017), (8.15, 0))
            ThreePointArc((8.15, 0), (8.15, -0.75), (8.145444143, -1.463312108))
            Line((8.145444143, -1.463312108), (8, -1.5))
        make_face()
    revolve(axis=Axis((0, 0, 4.5), (0, 0, 1)), mode=Mode.SUBTRACT)

    # Fillet4
    fillet4_edges = [part.edges().sort_by_distance(p)[0] for p in [
        (8, 0, 3),
    ]]
    fillet(fillet4_edges, radius=FILLET4_R)


solid = part.part
